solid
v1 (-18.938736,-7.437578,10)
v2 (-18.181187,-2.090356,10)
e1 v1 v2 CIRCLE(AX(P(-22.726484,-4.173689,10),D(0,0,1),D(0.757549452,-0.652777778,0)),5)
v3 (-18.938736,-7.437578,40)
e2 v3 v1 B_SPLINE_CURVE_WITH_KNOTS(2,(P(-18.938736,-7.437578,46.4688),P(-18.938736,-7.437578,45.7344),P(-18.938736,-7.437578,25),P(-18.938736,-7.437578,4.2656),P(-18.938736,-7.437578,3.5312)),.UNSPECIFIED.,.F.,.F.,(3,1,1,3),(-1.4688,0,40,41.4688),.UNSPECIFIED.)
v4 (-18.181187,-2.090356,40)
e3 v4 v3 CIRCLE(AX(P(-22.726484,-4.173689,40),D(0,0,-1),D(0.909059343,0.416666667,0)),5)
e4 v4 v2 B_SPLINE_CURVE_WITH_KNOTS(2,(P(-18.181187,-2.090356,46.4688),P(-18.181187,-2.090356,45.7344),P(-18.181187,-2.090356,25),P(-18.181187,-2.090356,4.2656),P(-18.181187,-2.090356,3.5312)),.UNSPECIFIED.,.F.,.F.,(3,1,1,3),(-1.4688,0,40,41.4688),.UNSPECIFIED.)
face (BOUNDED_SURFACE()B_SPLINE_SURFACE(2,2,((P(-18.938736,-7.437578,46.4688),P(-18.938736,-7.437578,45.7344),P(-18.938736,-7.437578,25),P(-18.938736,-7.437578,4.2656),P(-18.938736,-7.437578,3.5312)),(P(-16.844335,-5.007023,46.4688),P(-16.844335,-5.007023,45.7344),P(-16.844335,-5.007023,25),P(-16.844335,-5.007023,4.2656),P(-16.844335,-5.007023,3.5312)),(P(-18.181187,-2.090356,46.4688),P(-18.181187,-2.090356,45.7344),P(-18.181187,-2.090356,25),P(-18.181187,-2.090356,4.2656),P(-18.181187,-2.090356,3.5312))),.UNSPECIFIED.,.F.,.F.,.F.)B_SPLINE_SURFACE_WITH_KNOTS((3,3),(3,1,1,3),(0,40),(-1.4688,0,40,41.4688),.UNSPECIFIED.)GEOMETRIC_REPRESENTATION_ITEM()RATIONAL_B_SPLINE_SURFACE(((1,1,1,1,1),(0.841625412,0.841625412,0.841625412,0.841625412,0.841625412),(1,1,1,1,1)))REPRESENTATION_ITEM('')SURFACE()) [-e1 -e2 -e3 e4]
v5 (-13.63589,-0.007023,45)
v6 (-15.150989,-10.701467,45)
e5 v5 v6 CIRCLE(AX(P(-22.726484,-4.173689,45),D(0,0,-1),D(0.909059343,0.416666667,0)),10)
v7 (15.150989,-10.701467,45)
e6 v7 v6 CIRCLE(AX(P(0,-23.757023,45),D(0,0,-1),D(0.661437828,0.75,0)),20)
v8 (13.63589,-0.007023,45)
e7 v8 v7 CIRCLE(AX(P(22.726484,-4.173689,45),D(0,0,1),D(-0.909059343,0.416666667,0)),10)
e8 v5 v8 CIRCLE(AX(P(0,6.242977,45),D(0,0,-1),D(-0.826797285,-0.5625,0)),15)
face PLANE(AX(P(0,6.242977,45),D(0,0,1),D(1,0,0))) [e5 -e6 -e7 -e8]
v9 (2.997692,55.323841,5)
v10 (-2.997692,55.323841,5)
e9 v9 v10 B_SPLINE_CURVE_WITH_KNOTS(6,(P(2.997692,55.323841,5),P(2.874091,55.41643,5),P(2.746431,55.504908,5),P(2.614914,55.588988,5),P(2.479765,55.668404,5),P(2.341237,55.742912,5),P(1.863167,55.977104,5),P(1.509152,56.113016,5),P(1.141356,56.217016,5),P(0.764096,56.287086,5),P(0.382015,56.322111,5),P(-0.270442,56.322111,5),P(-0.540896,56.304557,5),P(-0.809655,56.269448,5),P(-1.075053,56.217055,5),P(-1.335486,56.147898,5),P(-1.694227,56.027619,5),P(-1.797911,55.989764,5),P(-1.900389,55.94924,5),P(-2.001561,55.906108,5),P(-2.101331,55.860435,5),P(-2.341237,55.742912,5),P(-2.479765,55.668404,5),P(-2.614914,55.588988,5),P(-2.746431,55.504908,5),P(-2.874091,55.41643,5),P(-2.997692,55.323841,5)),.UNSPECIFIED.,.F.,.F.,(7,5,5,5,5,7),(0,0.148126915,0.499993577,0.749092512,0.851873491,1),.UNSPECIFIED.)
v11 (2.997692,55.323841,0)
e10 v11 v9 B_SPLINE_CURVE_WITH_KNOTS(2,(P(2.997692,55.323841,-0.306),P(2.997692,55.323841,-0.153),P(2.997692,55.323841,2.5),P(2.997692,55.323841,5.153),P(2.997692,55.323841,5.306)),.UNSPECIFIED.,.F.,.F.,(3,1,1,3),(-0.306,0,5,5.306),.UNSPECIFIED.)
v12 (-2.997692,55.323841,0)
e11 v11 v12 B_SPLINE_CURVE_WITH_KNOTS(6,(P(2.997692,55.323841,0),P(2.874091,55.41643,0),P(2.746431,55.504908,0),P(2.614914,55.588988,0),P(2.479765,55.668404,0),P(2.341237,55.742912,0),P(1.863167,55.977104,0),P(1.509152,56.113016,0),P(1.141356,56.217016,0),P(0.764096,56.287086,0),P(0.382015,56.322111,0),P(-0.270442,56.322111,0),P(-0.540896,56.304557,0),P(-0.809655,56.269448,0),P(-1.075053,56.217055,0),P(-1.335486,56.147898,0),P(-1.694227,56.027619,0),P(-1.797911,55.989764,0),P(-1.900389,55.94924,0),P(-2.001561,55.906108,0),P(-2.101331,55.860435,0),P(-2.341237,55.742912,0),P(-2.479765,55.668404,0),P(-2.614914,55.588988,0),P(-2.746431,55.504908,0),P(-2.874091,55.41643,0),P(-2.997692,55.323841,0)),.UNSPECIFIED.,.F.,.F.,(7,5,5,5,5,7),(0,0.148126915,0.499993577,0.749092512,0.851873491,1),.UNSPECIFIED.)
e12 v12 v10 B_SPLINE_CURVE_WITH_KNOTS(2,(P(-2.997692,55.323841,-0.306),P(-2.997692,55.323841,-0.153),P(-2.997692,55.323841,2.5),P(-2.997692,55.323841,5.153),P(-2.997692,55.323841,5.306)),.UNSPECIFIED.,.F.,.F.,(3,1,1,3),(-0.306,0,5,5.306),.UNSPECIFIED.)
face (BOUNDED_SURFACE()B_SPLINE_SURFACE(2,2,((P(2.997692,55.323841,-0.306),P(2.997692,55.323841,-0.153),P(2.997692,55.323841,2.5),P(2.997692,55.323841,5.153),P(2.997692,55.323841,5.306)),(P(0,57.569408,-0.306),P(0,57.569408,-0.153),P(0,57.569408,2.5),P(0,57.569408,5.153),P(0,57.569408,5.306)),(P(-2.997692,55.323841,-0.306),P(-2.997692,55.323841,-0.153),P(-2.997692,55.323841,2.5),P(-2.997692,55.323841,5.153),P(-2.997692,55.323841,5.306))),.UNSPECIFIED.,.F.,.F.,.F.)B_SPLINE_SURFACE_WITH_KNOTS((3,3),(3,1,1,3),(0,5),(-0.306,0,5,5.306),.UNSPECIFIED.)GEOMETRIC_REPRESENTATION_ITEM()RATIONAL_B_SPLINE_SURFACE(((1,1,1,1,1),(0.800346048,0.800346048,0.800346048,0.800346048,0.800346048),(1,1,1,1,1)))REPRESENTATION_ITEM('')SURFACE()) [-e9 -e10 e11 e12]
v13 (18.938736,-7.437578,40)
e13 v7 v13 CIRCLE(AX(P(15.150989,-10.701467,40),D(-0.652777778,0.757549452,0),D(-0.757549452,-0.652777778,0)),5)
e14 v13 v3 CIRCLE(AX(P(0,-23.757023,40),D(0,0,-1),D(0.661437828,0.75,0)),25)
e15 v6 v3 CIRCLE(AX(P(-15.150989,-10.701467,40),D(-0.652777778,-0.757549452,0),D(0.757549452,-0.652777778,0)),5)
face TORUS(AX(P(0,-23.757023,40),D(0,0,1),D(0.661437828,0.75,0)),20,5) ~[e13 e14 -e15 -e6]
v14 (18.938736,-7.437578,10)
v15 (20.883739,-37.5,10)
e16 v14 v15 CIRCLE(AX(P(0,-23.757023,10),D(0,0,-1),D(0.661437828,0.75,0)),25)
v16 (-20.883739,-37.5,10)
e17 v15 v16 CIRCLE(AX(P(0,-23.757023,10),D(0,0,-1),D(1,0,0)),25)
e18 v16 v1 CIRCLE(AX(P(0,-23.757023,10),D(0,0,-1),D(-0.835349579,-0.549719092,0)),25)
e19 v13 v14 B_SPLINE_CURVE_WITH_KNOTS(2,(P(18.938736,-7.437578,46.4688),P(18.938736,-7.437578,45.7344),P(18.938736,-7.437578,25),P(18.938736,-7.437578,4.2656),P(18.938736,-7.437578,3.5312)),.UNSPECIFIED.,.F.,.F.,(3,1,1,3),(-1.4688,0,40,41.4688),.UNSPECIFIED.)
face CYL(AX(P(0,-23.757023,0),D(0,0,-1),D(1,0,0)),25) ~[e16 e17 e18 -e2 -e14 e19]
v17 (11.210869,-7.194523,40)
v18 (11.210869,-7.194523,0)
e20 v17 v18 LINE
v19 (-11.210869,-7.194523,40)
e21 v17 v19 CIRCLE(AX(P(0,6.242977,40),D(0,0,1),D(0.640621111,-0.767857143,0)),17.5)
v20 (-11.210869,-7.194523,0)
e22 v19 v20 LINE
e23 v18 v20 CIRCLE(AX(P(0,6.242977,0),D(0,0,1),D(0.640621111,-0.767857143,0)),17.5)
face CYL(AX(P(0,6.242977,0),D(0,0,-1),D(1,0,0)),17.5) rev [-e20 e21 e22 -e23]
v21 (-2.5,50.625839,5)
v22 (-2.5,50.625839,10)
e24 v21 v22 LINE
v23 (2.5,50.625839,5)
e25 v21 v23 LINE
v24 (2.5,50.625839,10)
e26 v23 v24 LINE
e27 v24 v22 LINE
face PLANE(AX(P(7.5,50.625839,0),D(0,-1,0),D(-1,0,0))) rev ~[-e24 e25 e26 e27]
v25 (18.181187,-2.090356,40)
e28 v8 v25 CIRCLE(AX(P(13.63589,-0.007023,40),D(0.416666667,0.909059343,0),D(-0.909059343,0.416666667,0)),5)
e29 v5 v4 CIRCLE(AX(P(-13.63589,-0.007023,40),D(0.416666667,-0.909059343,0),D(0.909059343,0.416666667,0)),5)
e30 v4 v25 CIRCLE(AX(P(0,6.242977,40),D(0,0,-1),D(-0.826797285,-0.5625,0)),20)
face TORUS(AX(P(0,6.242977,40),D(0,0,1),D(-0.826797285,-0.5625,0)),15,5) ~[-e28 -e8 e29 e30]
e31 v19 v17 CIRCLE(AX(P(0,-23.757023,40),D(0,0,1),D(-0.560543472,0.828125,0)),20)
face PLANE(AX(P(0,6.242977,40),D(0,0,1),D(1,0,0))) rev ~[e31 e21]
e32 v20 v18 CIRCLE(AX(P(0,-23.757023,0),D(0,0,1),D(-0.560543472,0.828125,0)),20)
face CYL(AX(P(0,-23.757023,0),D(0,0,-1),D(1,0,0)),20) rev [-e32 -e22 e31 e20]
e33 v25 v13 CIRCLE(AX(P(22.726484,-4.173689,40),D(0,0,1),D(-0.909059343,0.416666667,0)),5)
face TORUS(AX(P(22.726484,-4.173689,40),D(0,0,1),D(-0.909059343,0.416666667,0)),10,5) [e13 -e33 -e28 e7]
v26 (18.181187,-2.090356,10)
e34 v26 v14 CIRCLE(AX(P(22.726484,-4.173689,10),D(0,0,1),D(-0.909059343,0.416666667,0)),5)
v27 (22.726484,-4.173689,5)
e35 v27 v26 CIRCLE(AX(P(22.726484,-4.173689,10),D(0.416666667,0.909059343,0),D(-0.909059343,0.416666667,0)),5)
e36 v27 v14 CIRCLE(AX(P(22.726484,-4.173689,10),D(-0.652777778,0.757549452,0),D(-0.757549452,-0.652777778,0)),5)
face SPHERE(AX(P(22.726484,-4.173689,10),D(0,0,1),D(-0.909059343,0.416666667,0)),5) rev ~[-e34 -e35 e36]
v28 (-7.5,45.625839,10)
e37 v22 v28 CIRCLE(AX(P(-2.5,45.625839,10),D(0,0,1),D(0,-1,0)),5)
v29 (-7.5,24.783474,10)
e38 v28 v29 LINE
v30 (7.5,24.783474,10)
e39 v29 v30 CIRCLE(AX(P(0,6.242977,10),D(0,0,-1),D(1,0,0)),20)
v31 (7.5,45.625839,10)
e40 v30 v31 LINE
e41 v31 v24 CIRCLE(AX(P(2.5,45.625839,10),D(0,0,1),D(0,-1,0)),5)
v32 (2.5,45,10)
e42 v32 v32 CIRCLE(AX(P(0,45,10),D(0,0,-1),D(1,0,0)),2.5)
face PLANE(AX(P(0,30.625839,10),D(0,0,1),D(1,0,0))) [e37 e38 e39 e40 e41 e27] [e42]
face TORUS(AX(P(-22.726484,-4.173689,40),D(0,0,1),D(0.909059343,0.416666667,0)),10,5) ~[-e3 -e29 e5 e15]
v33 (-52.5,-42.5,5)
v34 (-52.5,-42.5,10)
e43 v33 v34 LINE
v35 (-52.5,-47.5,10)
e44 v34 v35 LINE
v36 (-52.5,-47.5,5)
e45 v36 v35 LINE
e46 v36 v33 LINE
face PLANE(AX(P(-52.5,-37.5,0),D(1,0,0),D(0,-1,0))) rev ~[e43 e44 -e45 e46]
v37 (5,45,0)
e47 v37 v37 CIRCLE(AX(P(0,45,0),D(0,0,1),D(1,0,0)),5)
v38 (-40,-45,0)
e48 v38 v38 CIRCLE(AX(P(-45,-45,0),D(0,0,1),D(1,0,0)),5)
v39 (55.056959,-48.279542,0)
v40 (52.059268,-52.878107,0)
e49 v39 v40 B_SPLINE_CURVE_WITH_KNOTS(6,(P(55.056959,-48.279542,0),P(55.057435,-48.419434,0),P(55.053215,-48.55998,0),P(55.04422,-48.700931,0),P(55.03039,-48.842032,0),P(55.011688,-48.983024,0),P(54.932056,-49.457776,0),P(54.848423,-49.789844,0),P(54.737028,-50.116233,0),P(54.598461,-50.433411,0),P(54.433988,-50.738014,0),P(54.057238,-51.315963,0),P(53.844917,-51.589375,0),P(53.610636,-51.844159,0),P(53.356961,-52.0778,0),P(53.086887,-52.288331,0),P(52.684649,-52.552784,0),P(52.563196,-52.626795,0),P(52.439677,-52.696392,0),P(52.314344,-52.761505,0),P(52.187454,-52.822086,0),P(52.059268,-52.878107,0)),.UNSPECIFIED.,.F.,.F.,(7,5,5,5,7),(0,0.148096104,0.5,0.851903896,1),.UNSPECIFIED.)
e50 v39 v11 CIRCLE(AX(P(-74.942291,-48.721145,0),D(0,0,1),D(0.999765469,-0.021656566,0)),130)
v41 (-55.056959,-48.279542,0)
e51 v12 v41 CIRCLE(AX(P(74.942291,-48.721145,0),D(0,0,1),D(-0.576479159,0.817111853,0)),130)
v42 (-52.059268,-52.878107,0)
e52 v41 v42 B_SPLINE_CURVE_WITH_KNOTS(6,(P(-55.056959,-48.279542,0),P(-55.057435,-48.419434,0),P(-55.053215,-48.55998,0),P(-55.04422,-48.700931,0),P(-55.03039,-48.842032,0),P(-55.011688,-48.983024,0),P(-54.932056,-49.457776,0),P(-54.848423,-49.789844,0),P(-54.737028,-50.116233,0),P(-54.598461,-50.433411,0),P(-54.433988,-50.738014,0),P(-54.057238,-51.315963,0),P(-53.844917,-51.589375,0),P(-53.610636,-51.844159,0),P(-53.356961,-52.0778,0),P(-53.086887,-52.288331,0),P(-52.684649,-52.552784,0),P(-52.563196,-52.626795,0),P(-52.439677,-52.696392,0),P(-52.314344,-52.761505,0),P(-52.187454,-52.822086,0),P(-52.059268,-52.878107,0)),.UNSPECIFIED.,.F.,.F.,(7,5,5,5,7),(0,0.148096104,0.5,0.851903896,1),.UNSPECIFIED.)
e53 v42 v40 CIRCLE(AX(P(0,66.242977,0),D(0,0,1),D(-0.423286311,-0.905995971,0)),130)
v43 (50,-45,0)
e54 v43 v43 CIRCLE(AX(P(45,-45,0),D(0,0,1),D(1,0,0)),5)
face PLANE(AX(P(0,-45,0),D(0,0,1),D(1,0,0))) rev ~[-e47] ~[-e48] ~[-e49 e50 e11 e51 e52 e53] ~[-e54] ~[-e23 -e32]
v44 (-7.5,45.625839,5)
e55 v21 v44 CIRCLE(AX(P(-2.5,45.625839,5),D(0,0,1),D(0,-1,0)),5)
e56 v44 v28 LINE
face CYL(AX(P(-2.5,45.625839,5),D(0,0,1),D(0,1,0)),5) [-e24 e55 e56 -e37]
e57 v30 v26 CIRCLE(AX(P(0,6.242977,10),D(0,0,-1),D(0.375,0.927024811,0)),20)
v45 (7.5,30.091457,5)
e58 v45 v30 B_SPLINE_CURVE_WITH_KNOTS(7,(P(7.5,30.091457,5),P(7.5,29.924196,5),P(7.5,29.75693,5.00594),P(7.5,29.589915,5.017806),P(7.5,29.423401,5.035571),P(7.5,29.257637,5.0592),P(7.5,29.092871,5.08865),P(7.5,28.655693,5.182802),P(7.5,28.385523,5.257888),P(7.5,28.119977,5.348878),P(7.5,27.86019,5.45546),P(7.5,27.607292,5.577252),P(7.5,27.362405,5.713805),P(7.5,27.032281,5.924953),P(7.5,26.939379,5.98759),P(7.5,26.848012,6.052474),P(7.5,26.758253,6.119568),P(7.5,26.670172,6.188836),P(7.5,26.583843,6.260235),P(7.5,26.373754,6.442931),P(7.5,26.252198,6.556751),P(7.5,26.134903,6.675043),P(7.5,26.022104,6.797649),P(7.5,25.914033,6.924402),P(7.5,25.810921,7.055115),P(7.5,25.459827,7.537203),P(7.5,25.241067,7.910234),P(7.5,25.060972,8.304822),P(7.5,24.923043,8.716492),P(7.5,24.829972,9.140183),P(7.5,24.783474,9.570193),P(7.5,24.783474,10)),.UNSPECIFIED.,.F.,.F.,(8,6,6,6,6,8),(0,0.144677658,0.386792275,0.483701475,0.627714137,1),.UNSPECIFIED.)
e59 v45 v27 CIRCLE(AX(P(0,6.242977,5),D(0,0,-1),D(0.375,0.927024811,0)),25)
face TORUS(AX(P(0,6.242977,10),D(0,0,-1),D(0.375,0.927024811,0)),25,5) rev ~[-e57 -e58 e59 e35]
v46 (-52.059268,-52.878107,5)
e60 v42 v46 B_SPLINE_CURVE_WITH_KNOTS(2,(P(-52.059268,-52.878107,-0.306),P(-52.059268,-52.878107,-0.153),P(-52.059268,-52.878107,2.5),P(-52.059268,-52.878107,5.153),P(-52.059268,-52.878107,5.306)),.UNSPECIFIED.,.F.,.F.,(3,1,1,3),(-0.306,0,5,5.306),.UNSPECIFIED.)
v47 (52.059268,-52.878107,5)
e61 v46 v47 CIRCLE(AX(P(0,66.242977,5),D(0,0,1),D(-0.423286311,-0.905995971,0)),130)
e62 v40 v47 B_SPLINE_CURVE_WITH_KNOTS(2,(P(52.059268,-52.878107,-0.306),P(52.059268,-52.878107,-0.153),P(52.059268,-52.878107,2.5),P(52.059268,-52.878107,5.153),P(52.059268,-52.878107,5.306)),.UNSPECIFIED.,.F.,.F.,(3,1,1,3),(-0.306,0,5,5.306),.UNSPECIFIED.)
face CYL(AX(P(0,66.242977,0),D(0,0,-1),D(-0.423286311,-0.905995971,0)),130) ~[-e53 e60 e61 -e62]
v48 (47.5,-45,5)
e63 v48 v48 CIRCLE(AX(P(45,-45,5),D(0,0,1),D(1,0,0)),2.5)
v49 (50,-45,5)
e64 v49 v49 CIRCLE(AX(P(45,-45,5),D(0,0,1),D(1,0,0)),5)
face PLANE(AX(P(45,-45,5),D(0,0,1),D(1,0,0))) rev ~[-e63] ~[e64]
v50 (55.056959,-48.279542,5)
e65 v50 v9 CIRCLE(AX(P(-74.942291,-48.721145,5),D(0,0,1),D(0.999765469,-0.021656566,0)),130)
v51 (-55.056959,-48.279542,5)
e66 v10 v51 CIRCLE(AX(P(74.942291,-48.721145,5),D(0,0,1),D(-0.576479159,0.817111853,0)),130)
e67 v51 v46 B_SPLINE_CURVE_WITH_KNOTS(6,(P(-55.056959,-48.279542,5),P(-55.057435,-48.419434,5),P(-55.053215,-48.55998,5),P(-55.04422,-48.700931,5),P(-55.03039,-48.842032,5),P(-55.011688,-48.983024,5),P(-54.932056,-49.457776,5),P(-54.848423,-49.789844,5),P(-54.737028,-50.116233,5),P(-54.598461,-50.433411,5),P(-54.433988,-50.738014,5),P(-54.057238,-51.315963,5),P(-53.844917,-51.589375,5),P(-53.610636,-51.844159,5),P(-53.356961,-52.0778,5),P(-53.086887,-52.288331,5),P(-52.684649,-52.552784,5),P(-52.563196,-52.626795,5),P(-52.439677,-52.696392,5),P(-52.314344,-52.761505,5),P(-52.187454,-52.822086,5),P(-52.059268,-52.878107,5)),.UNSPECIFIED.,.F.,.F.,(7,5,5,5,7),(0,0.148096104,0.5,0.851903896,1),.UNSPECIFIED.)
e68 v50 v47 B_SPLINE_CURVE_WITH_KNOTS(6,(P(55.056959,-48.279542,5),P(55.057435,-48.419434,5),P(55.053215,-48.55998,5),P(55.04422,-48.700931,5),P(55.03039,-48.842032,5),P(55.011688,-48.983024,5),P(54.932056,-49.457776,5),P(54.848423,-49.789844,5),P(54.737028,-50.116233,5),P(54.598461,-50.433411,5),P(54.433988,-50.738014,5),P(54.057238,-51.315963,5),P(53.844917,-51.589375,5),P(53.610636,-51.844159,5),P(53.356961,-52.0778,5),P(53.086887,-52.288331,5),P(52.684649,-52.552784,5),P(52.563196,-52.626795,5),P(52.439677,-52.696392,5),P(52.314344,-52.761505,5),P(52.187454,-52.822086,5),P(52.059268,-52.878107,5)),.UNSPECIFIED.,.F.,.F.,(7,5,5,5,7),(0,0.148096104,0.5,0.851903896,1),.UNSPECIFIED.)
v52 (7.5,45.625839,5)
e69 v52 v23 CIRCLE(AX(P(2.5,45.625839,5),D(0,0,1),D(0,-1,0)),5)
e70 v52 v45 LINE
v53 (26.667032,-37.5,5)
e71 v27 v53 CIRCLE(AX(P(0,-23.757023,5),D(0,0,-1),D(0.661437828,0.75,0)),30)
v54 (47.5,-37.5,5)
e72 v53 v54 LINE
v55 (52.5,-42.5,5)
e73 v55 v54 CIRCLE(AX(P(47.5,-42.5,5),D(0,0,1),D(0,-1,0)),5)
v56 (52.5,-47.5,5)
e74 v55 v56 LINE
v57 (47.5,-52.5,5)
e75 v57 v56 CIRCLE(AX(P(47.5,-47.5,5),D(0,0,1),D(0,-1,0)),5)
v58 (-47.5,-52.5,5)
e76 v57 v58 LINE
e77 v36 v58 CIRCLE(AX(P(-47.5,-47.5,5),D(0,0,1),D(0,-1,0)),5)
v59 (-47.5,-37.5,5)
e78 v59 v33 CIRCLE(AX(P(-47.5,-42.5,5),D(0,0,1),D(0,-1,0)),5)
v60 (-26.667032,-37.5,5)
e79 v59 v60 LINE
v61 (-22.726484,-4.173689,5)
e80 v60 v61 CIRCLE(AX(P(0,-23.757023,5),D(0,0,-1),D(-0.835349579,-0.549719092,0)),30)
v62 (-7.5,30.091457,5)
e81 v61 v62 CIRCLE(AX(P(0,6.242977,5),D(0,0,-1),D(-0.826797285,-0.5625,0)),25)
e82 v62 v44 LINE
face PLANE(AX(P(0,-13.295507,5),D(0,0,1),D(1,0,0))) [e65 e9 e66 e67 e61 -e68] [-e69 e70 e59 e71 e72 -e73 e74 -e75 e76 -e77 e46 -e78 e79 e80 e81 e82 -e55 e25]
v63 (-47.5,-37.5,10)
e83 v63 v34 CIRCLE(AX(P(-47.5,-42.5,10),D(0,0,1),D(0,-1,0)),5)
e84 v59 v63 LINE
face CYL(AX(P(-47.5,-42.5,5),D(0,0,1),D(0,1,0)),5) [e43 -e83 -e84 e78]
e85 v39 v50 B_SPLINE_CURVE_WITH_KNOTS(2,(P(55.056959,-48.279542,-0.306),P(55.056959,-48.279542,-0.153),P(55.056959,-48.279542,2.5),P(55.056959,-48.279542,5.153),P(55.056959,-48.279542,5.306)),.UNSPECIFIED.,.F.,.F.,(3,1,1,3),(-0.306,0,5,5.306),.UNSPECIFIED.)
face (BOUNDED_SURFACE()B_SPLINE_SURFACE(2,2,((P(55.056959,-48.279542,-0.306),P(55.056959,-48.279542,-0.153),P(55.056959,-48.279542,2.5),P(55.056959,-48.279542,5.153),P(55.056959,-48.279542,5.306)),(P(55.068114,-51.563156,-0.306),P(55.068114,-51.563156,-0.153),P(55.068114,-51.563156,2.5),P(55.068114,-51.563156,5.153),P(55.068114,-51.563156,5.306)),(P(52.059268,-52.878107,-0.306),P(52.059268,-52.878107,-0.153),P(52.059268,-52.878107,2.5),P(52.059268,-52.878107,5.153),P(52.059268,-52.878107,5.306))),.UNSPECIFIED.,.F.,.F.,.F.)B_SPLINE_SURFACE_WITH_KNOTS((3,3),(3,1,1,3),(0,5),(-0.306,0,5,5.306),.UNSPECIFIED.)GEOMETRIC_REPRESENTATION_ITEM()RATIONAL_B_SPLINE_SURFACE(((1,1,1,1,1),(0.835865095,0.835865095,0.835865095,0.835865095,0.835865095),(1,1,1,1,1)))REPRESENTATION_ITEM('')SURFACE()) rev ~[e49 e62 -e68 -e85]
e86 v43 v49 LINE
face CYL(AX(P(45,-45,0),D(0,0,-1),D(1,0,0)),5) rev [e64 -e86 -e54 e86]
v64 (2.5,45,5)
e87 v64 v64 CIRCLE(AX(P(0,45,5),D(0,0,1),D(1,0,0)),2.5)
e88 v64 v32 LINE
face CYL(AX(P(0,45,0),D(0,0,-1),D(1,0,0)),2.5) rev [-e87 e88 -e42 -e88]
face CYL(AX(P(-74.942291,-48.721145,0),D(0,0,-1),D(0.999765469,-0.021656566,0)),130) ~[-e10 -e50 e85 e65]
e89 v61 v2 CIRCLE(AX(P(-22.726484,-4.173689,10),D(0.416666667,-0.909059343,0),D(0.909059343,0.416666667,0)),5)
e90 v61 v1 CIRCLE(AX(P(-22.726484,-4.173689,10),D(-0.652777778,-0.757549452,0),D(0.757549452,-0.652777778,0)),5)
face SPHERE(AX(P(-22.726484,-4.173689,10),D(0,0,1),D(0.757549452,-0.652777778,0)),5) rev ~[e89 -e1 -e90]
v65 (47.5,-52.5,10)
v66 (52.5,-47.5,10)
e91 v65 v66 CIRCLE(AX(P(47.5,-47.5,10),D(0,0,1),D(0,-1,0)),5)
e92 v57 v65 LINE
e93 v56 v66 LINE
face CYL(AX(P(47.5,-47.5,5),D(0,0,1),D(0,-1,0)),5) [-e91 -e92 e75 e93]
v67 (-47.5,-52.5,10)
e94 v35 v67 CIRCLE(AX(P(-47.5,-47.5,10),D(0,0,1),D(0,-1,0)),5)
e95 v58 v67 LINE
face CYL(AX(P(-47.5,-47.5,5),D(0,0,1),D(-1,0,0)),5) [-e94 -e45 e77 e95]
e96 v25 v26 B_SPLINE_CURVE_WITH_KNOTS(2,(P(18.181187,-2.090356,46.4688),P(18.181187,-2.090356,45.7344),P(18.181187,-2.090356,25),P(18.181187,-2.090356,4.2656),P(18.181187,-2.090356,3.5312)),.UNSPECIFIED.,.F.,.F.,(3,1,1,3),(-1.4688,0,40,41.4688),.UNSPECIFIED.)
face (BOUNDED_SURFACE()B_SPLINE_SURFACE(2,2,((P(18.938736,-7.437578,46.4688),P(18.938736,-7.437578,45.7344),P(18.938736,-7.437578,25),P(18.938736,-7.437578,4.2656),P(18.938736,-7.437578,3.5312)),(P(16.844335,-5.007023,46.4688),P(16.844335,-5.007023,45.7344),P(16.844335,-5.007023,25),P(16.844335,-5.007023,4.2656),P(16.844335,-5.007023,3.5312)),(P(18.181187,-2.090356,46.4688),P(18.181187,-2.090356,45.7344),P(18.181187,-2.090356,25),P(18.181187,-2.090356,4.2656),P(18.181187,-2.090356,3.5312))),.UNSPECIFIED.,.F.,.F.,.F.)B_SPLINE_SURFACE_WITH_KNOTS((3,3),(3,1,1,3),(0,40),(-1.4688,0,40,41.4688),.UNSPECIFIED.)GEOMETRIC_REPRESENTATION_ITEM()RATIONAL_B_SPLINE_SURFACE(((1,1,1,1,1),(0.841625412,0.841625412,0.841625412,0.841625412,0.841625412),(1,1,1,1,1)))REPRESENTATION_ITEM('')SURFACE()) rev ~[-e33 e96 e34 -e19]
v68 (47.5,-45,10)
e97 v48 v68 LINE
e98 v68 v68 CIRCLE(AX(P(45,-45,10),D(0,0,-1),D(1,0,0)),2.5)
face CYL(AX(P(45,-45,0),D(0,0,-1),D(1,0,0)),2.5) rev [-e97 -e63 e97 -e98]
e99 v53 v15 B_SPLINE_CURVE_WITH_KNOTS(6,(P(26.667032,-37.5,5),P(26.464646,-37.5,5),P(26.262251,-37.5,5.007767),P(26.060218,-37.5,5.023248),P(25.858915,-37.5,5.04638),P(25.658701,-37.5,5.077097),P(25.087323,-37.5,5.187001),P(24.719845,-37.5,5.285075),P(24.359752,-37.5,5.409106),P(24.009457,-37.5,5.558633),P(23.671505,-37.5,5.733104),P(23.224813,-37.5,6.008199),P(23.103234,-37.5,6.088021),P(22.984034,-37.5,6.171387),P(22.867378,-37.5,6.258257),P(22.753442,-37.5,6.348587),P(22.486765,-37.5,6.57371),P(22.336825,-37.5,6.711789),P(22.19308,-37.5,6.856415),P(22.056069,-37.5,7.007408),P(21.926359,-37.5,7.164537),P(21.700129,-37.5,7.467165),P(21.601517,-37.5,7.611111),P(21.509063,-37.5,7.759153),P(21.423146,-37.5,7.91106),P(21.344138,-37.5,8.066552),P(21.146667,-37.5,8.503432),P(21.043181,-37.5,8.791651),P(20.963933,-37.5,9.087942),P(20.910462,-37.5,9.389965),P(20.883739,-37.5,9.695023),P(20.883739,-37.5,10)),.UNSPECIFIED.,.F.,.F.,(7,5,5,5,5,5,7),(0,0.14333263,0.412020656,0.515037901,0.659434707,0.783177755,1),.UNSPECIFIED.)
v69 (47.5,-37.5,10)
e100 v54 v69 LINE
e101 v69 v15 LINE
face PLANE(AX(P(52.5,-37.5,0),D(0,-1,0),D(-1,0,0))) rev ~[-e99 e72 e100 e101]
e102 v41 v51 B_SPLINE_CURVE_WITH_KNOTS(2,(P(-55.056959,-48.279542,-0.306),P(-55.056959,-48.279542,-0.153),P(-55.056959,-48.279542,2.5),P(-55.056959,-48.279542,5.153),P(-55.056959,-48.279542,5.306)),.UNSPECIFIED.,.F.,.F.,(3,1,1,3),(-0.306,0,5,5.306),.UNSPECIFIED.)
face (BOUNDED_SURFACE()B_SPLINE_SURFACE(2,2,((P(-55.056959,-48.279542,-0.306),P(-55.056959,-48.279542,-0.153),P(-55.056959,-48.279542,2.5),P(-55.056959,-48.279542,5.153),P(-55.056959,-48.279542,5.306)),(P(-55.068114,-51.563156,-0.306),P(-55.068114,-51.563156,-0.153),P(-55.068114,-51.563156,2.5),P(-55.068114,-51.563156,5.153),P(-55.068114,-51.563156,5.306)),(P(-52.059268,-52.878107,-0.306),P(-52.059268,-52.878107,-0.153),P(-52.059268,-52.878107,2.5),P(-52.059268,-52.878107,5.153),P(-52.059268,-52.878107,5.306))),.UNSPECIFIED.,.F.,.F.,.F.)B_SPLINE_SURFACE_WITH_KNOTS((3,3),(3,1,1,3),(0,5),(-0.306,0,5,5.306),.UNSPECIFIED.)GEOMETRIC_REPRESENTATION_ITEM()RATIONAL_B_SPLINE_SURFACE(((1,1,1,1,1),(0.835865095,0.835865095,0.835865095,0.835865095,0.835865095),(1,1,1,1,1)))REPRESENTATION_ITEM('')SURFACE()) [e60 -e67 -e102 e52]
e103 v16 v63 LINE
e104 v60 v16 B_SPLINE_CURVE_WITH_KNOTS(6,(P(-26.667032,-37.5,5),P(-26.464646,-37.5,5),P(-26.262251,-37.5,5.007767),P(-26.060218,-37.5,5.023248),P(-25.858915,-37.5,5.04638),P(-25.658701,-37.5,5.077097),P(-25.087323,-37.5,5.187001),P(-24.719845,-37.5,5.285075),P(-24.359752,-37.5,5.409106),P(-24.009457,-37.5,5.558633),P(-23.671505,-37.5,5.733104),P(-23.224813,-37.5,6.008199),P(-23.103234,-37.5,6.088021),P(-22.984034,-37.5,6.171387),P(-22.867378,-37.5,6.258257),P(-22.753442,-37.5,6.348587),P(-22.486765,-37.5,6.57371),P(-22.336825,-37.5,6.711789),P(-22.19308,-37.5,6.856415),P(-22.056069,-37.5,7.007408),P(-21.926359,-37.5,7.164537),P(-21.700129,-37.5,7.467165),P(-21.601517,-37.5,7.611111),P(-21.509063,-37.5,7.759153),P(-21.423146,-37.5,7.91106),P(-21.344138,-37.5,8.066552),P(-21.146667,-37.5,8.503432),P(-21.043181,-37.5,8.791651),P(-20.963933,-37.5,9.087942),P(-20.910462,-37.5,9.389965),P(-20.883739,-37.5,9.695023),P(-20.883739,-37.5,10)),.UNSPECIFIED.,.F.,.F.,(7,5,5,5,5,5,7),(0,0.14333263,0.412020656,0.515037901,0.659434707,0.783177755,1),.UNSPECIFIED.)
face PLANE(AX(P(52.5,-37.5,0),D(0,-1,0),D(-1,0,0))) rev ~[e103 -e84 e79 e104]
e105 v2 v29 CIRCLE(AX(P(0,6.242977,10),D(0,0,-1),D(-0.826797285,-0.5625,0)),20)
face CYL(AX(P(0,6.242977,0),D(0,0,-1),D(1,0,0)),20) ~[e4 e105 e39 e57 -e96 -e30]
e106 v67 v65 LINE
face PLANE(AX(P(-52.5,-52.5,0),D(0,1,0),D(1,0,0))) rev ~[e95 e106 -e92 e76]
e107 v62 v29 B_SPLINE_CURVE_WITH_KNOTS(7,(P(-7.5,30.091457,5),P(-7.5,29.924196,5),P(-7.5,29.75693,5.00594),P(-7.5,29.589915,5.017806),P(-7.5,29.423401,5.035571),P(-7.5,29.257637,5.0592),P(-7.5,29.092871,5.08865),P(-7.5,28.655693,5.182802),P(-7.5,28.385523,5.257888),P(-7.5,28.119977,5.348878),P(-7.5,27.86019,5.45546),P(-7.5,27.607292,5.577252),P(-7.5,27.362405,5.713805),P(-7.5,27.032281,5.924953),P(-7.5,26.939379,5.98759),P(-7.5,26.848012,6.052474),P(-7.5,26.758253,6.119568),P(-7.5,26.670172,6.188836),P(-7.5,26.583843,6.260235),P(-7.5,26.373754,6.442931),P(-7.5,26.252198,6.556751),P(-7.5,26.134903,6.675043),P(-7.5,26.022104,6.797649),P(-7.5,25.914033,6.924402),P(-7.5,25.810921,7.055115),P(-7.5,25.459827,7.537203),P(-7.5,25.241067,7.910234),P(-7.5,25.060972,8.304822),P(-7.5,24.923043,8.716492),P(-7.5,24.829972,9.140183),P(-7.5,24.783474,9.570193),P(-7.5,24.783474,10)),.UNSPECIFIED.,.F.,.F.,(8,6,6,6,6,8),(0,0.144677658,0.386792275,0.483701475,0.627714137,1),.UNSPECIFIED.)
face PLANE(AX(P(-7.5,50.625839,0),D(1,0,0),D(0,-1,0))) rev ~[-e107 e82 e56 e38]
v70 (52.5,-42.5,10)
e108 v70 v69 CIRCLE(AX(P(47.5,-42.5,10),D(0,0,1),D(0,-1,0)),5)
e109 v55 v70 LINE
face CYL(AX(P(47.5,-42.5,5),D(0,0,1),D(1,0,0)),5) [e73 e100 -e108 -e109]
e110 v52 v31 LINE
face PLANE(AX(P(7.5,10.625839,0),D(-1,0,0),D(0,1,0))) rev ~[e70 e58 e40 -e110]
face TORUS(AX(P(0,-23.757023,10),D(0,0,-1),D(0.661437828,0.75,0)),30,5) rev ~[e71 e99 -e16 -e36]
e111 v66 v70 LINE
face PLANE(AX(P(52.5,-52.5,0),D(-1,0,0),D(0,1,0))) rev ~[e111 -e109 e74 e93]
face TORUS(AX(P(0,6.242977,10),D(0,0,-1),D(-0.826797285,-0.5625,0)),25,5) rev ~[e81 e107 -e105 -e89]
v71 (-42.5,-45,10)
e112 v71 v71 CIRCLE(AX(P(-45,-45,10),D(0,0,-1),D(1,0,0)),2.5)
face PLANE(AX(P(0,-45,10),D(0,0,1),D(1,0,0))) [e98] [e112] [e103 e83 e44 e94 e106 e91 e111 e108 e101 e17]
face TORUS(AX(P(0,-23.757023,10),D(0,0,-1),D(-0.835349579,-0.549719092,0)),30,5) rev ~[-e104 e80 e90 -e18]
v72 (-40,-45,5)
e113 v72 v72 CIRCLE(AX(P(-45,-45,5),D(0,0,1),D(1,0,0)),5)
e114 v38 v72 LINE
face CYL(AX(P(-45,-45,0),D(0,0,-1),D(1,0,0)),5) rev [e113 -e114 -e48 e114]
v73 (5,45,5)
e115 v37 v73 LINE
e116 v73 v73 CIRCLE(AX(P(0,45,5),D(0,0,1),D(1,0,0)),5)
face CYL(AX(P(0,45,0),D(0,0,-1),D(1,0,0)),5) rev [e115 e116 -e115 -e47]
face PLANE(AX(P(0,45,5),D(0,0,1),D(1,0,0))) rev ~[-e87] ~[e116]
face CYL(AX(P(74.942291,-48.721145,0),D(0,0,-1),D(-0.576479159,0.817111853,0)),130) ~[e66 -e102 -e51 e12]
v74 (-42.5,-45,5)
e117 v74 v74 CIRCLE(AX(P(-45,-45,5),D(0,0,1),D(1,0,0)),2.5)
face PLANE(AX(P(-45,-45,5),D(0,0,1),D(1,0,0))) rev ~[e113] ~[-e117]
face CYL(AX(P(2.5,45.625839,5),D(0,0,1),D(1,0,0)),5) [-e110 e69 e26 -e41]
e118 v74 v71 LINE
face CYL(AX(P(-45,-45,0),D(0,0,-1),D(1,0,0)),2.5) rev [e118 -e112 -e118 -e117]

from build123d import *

# Parameters (mm, degrees)
F5_DEPTH  = 5
F3_R      = 20
F2_R      = 25
F2_R_2    = 20
F6_DEPTH  = 50
F7_DEPTH  = 10
F0_R      = 5
F0_R_2    = 2.5
F8_DEPTH  = 5
F9_DEPTH  = 25
F10_R     = 17.5
F11_DEPTH = 40
F12_DEPTH = 5
F13_R     = 5
F14_R     = 5


with BuildPart() as f5:
    # F1 (on Top) → F5 (new body)
    with BuildSketch(Plane.XY):
        with BuildLine():
            ThreePointArc((55.0272203653, -51.5364989145), (41.1164714576, 9.8481618987), (0, 57.5033955377))
            ThreePointArc((0, 57.5033955377), (-41.1164714576, 9.8481618987), (-55.0272203653, -51.5364989145))
            ThreePointArc((-55.0272203653, -51.5364989145), (0, -63.7570226936), (55.0272203653, -51.5364989145))
        make_face()
        with BuildLine():
            ThreePointArc((-45, -45), (-32.3889723065, 4.9444861533), (0, 45))
            ThreePointArc((0, 45), (32.3889723065, 4.9444861533), (45, -45))
            ThreePointArc((45, -45), (0, -53.7570226936), (-45, -45))
        make_face(mode=Mode.SUBTRACT)
        with BuildLine():
            ThreePointArc((45, -45), (32.3889723065, 4.9444861533), (0, 45))
            ThreePointArc((0, 45), (-32.3889723065, 4.9444861533), (-45, -45))
            ThreePointArc((-45, -45), (0, -53.7570226936), (45, -45))
        make_face()
    extrude(amount=F5_DEPTH)

    # F3 (on Top) + F2 (on Top) → F6 (join)
    with BuildSketch(Plane.XY):
        with Locations((0, 6.2429773064)):
            Circle(F3_R)
    with BuildSketch(Plane.XY):
        with Locations((0, -23.7570226936)):
            Circle(F2_R)
        with Locations((0, -23.7570226936)):
            Circle(F2_R_2, mode=Mode.SUBTRACT)
        with Locations((0, -23.7570226936)):
            Circle(F2_R_2)
    extrude(amount=F6_DEPTH)

    # F4 (on Top) → F7 (join)
    with BuildSketch(Plane.XY):
        Polygon((52.5, -37.5), (0, -37.5), (-52.5, -37.5), (-52.5, -52.5), (52.5, -52.5), align=None)
        Polygon((-7.5, 10.6258387864), (0, 10.6258387864), (7.5, 10.6258387864), (7.5, 50.6258387864), (-7.5, 50.6258387864), align=None)
    extrude(amount=F7_DEPTH)

    # F0 (on Top) → F8 (cut)
    with BuildSketch(Plane.XY):
        with Locations((-45, -45)):
            Circle(F0_R)
        with Locations((-45, -45)):
            Circle(F0_R_2, mode=Mode.SUBTRACT)
        with Locations((0, 45)):
            Circle(F0_R)
        with Locations((0, 45)):
            Circle(F0_R_2, mode=Mode.SUBTRACT)
        with Locations((45, -45)):
            Circle(F0_R)
        with Locations((45, -45)):
            Circle(F0_R_2, mode=Mode.SUBTRACT)
    extrude(amount=F8_DEPTH, mode=Mode.SUBTRACT)

    # F0 (on Top) → F9 (cut)
    with BuildSketch(Plane.XY):
        with Locations((-45, -45)):
            Circle(F0_R_2)
        with Locations((0, 45)):
            Circle(F0_R_2)
        with Locations((45, -45)):
            Circle(F0_R_2)
    extrude(amount=F9_DEPTH, mode=Mode.SUBTRACT)

    # F10 (on face) + F2 (on Top) → F11 (cut)
    with BuildSketch(Plane.XY):
        with Locations((0, 6.2429773064)):
            Circle(F10_R)
    with BuildSketch(Plane.XY):
        with Locations((0, -23.7570226936)):
            Circle(F2_R_2)
    extrude(amount=F11_DEPTH, mode=Mode.SUBTRACT)

    # F12 (cut): a face of the model
    f12_faces = [f5.faces().sort_by_distance(p)[0] for p in [
        (0, -12.7665147671, 50),
    ]]
    extrude(f12_faces, amount=-F12_DEPTH, mode=Mode.SUBTRACT)

    # F13
    f13_edges = [f5.edges().sort_by_distance(p)[0] for p in [
        (52.5, -52.5, 7.5),
        (52.5, -37.5, 7.5),
        (55.02722, -51.536499, 2.5),
        (-55.02722, -51.536499, 2.5),
        (-52.5, -52.5, 7.5),
        (-52.5, -37.5, 7.5),
        (-7.5, 50.625839, 7.5),
        (0, 57.503396, 2.5),
        (7.5, 50.625839, 7.5),
    ]]
    fillet(f13_edges, radius=F13_R)

    # F14
    f14_edges = [f5.edges().sort_by_distance(p)[0] for p in [
        (19.138968, 12.04814, 5),
        (-24.779157, -20.441394, 5),
        (24.779157, -20.441394, 5),
        (-19.138968, 12.04814, 5),
        (-16.535946, -5.007023, 25),
        (16.535946, -5.007023, 25),
        (0, 26.242977, 45),
        (0, -48.757023, 45),
    ]]
    fillet(f14_edges, radius=F14_R)


solid = f5.part
